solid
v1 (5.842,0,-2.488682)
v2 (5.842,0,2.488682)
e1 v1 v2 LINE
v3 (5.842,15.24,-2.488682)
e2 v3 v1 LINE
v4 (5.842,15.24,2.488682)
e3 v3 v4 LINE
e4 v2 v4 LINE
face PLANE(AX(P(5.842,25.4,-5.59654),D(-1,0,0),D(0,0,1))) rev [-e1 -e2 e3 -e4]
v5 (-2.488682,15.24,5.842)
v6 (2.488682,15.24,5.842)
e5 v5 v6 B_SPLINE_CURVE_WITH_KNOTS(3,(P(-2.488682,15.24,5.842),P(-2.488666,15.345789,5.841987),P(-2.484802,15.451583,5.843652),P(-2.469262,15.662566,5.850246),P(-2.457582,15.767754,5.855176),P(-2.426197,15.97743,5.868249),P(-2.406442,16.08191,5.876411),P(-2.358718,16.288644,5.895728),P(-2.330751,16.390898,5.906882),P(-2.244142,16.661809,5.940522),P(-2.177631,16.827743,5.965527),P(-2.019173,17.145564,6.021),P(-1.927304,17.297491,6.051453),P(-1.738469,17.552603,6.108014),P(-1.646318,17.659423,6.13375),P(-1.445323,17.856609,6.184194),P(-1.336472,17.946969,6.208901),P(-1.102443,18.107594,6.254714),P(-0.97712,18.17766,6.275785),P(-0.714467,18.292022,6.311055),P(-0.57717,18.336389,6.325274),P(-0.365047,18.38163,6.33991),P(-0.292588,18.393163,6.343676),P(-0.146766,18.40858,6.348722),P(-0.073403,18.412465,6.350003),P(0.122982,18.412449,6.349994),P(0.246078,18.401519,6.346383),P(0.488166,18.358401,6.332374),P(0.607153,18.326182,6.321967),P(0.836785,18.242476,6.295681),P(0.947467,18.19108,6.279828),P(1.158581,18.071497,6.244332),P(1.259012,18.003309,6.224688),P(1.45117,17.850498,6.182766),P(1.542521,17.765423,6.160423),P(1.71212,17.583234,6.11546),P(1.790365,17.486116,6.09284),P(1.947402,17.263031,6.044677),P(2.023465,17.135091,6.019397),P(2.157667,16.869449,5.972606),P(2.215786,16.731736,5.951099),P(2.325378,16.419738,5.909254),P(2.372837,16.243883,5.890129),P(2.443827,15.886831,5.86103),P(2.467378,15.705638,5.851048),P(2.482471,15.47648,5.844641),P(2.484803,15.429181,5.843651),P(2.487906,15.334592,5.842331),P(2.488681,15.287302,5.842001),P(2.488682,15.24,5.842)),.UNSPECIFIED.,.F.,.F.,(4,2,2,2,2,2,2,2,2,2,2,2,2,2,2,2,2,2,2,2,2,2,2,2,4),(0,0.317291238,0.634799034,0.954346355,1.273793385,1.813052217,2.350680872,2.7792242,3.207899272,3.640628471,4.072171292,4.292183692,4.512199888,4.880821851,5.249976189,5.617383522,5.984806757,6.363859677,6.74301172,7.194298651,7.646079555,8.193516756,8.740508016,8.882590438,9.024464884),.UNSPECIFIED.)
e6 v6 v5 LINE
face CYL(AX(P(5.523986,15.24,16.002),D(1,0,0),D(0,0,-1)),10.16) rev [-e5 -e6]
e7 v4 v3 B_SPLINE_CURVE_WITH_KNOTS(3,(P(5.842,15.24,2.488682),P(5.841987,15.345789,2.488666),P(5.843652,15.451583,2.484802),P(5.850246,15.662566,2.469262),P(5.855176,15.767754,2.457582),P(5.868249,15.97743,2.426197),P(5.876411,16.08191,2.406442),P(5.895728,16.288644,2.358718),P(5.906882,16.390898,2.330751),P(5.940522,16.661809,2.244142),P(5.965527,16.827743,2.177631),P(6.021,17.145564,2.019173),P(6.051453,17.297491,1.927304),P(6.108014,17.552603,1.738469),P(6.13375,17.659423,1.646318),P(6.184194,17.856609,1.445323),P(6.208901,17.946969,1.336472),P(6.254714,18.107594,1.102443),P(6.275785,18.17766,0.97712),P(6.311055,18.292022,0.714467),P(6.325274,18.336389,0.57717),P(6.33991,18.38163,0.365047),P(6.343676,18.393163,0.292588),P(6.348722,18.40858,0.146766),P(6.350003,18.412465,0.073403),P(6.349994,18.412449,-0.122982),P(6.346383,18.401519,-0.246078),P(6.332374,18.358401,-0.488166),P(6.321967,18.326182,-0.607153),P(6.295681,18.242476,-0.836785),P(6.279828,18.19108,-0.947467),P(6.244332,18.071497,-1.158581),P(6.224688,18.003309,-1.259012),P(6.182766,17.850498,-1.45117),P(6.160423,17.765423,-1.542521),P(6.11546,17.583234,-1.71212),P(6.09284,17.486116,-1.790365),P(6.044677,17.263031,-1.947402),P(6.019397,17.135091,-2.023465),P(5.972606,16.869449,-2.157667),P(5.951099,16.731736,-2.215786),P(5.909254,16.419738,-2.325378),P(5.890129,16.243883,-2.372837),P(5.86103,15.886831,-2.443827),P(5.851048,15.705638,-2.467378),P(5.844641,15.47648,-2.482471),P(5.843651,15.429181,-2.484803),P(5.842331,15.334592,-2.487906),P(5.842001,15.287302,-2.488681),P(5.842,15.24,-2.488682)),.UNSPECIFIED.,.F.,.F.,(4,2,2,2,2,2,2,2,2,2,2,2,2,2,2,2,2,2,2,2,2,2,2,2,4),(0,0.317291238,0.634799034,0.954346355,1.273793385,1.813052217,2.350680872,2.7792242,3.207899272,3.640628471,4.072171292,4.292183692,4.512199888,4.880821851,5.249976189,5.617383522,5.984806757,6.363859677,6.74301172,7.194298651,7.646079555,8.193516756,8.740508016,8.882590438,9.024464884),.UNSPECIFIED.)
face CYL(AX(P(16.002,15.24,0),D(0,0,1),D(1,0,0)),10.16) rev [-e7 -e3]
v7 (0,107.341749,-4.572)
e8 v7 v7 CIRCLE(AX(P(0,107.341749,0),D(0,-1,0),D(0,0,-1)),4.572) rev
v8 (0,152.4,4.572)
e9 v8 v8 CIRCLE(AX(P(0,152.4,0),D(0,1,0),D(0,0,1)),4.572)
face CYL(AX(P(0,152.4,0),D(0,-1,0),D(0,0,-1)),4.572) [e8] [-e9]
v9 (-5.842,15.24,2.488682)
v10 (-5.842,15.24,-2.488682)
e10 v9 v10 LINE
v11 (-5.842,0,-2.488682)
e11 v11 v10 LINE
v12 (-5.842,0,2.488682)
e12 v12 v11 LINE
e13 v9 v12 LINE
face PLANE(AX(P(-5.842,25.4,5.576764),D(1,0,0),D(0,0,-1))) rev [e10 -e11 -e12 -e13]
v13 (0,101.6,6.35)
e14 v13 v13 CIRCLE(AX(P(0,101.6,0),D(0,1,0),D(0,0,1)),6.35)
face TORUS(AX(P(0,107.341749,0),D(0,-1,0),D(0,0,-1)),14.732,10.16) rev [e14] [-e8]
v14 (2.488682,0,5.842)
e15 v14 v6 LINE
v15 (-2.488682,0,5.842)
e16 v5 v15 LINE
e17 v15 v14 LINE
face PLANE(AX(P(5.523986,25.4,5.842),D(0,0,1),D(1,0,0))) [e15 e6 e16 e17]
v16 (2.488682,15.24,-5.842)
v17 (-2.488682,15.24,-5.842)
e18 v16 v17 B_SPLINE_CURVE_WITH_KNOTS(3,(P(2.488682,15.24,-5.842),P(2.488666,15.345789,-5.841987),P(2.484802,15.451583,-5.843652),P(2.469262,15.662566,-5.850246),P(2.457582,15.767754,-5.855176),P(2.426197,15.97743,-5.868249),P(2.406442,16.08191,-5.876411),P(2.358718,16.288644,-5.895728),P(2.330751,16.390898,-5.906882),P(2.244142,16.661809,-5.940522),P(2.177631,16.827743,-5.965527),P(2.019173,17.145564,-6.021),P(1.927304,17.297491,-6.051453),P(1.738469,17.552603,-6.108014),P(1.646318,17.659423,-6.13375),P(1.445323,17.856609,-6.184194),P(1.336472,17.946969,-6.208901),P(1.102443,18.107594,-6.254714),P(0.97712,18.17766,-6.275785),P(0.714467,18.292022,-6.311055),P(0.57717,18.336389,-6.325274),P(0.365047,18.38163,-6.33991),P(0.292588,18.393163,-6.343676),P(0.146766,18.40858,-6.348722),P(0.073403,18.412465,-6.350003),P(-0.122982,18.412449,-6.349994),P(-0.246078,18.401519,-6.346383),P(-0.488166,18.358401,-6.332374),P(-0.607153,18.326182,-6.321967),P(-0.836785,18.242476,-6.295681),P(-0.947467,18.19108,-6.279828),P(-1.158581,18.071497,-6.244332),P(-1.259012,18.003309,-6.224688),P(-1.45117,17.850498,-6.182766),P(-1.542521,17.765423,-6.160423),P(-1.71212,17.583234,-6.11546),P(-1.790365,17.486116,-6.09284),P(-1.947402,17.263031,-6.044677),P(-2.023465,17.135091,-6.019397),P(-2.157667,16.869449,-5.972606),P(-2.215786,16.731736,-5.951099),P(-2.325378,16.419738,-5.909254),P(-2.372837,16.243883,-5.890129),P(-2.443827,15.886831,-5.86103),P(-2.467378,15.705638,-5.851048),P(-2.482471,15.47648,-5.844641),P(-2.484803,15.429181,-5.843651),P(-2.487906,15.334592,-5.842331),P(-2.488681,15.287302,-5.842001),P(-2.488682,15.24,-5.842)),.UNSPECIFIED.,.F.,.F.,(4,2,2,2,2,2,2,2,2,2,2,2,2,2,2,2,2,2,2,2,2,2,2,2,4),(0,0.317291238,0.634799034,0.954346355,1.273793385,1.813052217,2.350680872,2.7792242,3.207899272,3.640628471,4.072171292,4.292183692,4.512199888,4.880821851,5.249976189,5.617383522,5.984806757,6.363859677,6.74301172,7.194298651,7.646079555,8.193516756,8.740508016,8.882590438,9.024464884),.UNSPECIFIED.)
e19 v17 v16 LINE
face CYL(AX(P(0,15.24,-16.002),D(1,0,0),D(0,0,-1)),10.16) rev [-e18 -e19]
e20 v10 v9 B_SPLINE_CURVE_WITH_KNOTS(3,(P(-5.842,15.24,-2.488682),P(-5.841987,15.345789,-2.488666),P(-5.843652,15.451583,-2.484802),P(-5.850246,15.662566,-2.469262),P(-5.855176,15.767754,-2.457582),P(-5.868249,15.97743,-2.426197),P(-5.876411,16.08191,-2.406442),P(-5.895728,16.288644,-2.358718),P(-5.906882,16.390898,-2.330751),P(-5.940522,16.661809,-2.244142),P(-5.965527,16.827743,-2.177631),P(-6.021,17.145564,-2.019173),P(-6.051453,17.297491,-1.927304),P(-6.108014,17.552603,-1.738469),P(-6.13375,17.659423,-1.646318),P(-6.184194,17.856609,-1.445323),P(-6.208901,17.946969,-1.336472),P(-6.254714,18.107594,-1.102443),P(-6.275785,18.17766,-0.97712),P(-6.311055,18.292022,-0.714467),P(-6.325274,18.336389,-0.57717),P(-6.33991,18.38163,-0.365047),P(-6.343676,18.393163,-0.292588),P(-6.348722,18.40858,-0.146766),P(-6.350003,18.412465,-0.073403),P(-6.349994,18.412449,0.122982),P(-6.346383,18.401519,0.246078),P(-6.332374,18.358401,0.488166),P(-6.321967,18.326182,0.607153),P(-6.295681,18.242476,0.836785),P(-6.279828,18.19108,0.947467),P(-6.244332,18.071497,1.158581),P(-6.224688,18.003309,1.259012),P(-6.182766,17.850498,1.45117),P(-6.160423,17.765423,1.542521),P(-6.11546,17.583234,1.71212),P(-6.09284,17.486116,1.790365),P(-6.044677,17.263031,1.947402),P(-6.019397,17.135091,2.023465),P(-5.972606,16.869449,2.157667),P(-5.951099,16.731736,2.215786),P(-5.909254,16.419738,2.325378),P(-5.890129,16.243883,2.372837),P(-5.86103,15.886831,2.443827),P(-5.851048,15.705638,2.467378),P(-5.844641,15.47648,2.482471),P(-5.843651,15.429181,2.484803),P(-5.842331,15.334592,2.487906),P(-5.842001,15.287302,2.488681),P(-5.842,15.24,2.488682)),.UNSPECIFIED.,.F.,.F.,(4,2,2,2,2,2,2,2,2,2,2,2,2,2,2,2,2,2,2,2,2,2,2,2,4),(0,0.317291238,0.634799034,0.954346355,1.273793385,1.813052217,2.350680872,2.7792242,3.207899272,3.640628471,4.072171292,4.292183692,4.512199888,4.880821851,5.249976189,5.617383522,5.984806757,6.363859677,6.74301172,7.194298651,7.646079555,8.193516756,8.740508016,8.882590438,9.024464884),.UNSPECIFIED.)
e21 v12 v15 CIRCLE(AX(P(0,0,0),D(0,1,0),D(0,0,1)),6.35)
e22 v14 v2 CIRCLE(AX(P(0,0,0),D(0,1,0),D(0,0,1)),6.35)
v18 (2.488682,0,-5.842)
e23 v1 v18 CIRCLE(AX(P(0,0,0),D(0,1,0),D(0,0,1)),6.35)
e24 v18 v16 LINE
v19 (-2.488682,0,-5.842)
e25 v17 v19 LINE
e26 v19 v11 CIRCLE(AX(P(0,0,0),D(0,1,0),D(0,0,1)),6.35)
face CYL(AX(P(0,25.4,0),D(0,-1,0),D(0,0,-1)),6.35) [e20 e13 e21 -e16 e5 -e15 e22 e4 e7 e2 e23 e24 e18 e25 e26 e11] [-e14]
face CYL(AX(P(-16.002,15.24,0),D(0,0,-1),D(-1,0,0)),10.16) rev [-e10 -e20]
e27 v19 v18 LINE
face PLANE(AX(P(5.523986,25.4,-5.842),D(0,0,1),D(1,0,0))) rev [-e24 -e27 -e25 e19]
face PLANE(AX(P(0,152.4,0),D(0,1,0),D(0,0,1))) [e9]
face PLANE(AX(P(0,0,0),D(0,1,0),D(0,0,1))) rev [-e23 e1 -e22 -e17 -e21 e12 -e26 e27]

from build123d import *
from build123d.topology import SkipClean

# Parameters (mm, degrees)
SKETCH1_R           = 6.35
BOSS_EXTRUDE1_DEPTH = 25.4
SKETCH3_W           = 3.762901665
SKETCH3_H           = 11.173304621
SKETCH3_W_2         = 4.189249379
CUT_EXTRUDE2_DEPTH  = 25.4
CUT_EXTRUDE3_DEPTH  = 25.4
SKETCH5_R           = 6.35
BOSS_EXTRUDE2_DEPTH = 76.2
FILLET2_R           = 10.16
FILLET3_R           = 10.16
SKETCH6_R           = 4.572
BOSS_EXTRUDE3_DEPTH = 50.8
FILLET5_R           = 10.16


with BuildPart() as part:
    # Sketch1 → Boss-Extrude1 (new body)
    with BuildSketch(Plane(origin=(0, 0, 0), x_dir=(1, 0, 0), z_dir=(0, 1, 0))):
        with Locations(Location((0, 0, 0), (0, 0, 270))):
            Circle(SKETCH1_R)
    extrude(amount=BOSS_EXTRUDE1_DEPTH)

    # Sketch3 → Cut-Extrude2 (cut)
    with BuildSketch(Plane.XZ):
        with Locations((7.723450833, -0.009887881)):
            Rectangle(SKETCH3_W, SKETCH3_H)
        with Locations((-7.93662469, -0.009887881)):
            Rectangle(SKETCH3_W_2, SKETCH3_H)
    extrude(amount=-CUT_EXTRUDE2_DEPTH, mode=Mode.SUBTRACT)

    # Sketch4 → Cut-Extrude3 (cut)
    with BuildSketch(Plane.XZ):
        Polygon((5.523986446, -5.842), (-7.059783038, -5.842), (-7.059783038, -10.872351768), (5.523986446, -11.066959799), align=None)
    cut_extrude3 = extrude(amount=-CUT_EXTRUDE3_DEPTH, mode=Mode.SUBTRACT)

    # Sketch5 → Boss-Extrude2 (add)
    with BuildSketch(Plane(origin=(0, 25.4, 0), x_dir=(1, 0, 0), z_dir=(0, 1, 0))):
        with Locations(Location((0, 0, 0), (0, 0, 66.926081934))):
            Circle(SKETCH5_R)
    extrude(amount=BOSS_EXTRUDE2_DEPTH)

    # Fillet2
    # the kernel refuses this fillet: 10.16 mm, written as the material it adds along each edge
    with BuildSketch(Plane(origin=(-5.842, 25.4, 27.888681579), x_dir=(0, -1, 0), z_dir=(0, 0, -1))) as fillet2_piece_1_section:
        with BuildLine():
            CenterArc((FILLET2_R, FILLET2_R), FILLET2_R, 180, 90)
            Line((0, FILLET2_R), (0, 0))
            Line((0, 0), (FILLET2_R, 0))
        make_face()
    fillet2_piece_1 = extrude(amount=55.777363157, mode=Mode.PRIVATE)
    fillet2_piece_1 = fillet2_piece_1 & Plane(origin=(0, 21.230044771, 0), x_dir=(0, 0, 1), z_dir=(0, -1, 0)) * Cylinder(6.35, 153, mode=Mode.PRIVATE)
    add(fillet2_piece_1)
    with BuildSketch(Plane(origin=(5.842, 25.4, 27.888681579), x_dir=(0, -1, 0), z_dir=(0, 0, -1))) as fillet2_piece_2_section:
        with BuildLine():
            CenterArc((FILLET2_R, -FILLET2_R), FILLET2_R, 90, 90)
            Line((0, -FILLET2_R), (0, 0))
            Line((0, 0), (FILLET2_R, 0))
        make_face()
    fillet2_piece_2 = extrude(amount=55.777363157, mode=Mode.PRIVATE)
    fillet2_piece_2 = fillet2_piece_2 & Plane(origin=(0, 21.230044771, 0), x_dir=(0, 0, 1), z_dir=(0, -1, 0)) * Cylinder(6.35, 153, mode=Mode.PRIVATE)
    add(fillet2_piece_2)

    # Mirror1: Cut-Extrude3 across plane
    with SkipClean():  # the faces are left unmerged after this step: merging them gives an invalid solid
        add(cut_extrude3.mirror(Plane.XY), mode=Mode.SUBTRACT)
    add(part.part.scale(1), mode=Mode.REPLACE)  # the faces are merged on a copy

    # Fillet3
    # the kernel refuses this fillet: 10.16 mm, written as the material it adds along each edge
    with BuildSketch(Plane(origin=(27.888681579, 25.4, 5.842), x_dir=(0, -1, 0), z_dir=(-1, 0, 0))) as fillet3_piece_1_section:
        with BuildLine():
            CenterArc((FILLET3_R, FILLET3_R), FILLET3_R, 180, 90)
            Line((0, FILLET3_R), (0, 0))
            Line((0, 0), (FILLET3_R, 0))
        make_face()
    fillet3_piece_1 = extrude(amount=55.777363157, mode=Mode.PRIVATE)
    fillet3_piece_1 = fillet3_piece_1 & Plane(origin=(0, 21.230043926, 0), x_dir=(0, 0, 1), z_dir=(0, -1, 0)) * Cylinder(6.35, 153, mode=Mode.PRIVATE)
    add(fillet3_piece_1)
    with BuildSketch(Plane(origin=(27.888681579, 25.4, -5.842), x_dir=(0, 0, -1), z_dir=(-1, 0, 0))) as fillet3_piece_2_section:
        with BuildLine():
            CenterArc((FILLET3_R, FILLET3_R), FILLET3_R, 180, 90)
            Line((0, FILLET3_R), (0, 0))
            Line((0, 0), (FILLET3_R, 0))
        make_face()
    fillet3_piece_2 = extrude(amount=55.777363157, mode=Mode.PRIVATE)
    fillet3_piece_2 = fillet3_piece_2 & Plane(origin=(0, 21.230042518, 0), x_dir=(0, 0, 1), z_dir=(0, -1, 0)) * Cylinder(6.35, 153, mode=Mode.PRIVATE)
    add(fillet3_piece_2)

    # Sketch6 → Boss-Extrude3 (add)
    with BuildSketch(Plane(origin=(0, 101.6, 0), x_dir=(1, 0, 0), z_dir=(0, 1, 0))):
        with Locations(Location((0, 0, 0), (0, 0, 270))):
            Circle(SKETCH6_R)
    extrude(amount=BOSS_EXTRUDE3_DEPTH)

    # Fillet5
    # the kernel refuses this fillet: 10.16 mm, written as the material it adds along each edge
    with BuildSketch(Plane(origin=(0, 101.6, 0), x_dir=(0, 0, 1), z_dir=(-1, 0, 0))) as fillet5_piece_1:
        with BuildLine():
            CenterArc((14.732, 5.741748514), FILLET5_R, 180, 34.41150867)
            Line((4.572, 5.741748514), (4.3688, 5.741748514))
            Line((4.3688, 5.741748514), (4.3688, 0))
            Line((4.3688, 0), (4.572, -0.2032))
            ThreePointArc((4.572, -0.2032), (5.461, -0.2032), (6.18236, -0.11483497))
            Line((6.18236, -0.11483497), (6.35, 0))
        make_face()
    revolve(axis=Axis((0, 101.6, 0), (0, 1, 0)))


solid = part.part
